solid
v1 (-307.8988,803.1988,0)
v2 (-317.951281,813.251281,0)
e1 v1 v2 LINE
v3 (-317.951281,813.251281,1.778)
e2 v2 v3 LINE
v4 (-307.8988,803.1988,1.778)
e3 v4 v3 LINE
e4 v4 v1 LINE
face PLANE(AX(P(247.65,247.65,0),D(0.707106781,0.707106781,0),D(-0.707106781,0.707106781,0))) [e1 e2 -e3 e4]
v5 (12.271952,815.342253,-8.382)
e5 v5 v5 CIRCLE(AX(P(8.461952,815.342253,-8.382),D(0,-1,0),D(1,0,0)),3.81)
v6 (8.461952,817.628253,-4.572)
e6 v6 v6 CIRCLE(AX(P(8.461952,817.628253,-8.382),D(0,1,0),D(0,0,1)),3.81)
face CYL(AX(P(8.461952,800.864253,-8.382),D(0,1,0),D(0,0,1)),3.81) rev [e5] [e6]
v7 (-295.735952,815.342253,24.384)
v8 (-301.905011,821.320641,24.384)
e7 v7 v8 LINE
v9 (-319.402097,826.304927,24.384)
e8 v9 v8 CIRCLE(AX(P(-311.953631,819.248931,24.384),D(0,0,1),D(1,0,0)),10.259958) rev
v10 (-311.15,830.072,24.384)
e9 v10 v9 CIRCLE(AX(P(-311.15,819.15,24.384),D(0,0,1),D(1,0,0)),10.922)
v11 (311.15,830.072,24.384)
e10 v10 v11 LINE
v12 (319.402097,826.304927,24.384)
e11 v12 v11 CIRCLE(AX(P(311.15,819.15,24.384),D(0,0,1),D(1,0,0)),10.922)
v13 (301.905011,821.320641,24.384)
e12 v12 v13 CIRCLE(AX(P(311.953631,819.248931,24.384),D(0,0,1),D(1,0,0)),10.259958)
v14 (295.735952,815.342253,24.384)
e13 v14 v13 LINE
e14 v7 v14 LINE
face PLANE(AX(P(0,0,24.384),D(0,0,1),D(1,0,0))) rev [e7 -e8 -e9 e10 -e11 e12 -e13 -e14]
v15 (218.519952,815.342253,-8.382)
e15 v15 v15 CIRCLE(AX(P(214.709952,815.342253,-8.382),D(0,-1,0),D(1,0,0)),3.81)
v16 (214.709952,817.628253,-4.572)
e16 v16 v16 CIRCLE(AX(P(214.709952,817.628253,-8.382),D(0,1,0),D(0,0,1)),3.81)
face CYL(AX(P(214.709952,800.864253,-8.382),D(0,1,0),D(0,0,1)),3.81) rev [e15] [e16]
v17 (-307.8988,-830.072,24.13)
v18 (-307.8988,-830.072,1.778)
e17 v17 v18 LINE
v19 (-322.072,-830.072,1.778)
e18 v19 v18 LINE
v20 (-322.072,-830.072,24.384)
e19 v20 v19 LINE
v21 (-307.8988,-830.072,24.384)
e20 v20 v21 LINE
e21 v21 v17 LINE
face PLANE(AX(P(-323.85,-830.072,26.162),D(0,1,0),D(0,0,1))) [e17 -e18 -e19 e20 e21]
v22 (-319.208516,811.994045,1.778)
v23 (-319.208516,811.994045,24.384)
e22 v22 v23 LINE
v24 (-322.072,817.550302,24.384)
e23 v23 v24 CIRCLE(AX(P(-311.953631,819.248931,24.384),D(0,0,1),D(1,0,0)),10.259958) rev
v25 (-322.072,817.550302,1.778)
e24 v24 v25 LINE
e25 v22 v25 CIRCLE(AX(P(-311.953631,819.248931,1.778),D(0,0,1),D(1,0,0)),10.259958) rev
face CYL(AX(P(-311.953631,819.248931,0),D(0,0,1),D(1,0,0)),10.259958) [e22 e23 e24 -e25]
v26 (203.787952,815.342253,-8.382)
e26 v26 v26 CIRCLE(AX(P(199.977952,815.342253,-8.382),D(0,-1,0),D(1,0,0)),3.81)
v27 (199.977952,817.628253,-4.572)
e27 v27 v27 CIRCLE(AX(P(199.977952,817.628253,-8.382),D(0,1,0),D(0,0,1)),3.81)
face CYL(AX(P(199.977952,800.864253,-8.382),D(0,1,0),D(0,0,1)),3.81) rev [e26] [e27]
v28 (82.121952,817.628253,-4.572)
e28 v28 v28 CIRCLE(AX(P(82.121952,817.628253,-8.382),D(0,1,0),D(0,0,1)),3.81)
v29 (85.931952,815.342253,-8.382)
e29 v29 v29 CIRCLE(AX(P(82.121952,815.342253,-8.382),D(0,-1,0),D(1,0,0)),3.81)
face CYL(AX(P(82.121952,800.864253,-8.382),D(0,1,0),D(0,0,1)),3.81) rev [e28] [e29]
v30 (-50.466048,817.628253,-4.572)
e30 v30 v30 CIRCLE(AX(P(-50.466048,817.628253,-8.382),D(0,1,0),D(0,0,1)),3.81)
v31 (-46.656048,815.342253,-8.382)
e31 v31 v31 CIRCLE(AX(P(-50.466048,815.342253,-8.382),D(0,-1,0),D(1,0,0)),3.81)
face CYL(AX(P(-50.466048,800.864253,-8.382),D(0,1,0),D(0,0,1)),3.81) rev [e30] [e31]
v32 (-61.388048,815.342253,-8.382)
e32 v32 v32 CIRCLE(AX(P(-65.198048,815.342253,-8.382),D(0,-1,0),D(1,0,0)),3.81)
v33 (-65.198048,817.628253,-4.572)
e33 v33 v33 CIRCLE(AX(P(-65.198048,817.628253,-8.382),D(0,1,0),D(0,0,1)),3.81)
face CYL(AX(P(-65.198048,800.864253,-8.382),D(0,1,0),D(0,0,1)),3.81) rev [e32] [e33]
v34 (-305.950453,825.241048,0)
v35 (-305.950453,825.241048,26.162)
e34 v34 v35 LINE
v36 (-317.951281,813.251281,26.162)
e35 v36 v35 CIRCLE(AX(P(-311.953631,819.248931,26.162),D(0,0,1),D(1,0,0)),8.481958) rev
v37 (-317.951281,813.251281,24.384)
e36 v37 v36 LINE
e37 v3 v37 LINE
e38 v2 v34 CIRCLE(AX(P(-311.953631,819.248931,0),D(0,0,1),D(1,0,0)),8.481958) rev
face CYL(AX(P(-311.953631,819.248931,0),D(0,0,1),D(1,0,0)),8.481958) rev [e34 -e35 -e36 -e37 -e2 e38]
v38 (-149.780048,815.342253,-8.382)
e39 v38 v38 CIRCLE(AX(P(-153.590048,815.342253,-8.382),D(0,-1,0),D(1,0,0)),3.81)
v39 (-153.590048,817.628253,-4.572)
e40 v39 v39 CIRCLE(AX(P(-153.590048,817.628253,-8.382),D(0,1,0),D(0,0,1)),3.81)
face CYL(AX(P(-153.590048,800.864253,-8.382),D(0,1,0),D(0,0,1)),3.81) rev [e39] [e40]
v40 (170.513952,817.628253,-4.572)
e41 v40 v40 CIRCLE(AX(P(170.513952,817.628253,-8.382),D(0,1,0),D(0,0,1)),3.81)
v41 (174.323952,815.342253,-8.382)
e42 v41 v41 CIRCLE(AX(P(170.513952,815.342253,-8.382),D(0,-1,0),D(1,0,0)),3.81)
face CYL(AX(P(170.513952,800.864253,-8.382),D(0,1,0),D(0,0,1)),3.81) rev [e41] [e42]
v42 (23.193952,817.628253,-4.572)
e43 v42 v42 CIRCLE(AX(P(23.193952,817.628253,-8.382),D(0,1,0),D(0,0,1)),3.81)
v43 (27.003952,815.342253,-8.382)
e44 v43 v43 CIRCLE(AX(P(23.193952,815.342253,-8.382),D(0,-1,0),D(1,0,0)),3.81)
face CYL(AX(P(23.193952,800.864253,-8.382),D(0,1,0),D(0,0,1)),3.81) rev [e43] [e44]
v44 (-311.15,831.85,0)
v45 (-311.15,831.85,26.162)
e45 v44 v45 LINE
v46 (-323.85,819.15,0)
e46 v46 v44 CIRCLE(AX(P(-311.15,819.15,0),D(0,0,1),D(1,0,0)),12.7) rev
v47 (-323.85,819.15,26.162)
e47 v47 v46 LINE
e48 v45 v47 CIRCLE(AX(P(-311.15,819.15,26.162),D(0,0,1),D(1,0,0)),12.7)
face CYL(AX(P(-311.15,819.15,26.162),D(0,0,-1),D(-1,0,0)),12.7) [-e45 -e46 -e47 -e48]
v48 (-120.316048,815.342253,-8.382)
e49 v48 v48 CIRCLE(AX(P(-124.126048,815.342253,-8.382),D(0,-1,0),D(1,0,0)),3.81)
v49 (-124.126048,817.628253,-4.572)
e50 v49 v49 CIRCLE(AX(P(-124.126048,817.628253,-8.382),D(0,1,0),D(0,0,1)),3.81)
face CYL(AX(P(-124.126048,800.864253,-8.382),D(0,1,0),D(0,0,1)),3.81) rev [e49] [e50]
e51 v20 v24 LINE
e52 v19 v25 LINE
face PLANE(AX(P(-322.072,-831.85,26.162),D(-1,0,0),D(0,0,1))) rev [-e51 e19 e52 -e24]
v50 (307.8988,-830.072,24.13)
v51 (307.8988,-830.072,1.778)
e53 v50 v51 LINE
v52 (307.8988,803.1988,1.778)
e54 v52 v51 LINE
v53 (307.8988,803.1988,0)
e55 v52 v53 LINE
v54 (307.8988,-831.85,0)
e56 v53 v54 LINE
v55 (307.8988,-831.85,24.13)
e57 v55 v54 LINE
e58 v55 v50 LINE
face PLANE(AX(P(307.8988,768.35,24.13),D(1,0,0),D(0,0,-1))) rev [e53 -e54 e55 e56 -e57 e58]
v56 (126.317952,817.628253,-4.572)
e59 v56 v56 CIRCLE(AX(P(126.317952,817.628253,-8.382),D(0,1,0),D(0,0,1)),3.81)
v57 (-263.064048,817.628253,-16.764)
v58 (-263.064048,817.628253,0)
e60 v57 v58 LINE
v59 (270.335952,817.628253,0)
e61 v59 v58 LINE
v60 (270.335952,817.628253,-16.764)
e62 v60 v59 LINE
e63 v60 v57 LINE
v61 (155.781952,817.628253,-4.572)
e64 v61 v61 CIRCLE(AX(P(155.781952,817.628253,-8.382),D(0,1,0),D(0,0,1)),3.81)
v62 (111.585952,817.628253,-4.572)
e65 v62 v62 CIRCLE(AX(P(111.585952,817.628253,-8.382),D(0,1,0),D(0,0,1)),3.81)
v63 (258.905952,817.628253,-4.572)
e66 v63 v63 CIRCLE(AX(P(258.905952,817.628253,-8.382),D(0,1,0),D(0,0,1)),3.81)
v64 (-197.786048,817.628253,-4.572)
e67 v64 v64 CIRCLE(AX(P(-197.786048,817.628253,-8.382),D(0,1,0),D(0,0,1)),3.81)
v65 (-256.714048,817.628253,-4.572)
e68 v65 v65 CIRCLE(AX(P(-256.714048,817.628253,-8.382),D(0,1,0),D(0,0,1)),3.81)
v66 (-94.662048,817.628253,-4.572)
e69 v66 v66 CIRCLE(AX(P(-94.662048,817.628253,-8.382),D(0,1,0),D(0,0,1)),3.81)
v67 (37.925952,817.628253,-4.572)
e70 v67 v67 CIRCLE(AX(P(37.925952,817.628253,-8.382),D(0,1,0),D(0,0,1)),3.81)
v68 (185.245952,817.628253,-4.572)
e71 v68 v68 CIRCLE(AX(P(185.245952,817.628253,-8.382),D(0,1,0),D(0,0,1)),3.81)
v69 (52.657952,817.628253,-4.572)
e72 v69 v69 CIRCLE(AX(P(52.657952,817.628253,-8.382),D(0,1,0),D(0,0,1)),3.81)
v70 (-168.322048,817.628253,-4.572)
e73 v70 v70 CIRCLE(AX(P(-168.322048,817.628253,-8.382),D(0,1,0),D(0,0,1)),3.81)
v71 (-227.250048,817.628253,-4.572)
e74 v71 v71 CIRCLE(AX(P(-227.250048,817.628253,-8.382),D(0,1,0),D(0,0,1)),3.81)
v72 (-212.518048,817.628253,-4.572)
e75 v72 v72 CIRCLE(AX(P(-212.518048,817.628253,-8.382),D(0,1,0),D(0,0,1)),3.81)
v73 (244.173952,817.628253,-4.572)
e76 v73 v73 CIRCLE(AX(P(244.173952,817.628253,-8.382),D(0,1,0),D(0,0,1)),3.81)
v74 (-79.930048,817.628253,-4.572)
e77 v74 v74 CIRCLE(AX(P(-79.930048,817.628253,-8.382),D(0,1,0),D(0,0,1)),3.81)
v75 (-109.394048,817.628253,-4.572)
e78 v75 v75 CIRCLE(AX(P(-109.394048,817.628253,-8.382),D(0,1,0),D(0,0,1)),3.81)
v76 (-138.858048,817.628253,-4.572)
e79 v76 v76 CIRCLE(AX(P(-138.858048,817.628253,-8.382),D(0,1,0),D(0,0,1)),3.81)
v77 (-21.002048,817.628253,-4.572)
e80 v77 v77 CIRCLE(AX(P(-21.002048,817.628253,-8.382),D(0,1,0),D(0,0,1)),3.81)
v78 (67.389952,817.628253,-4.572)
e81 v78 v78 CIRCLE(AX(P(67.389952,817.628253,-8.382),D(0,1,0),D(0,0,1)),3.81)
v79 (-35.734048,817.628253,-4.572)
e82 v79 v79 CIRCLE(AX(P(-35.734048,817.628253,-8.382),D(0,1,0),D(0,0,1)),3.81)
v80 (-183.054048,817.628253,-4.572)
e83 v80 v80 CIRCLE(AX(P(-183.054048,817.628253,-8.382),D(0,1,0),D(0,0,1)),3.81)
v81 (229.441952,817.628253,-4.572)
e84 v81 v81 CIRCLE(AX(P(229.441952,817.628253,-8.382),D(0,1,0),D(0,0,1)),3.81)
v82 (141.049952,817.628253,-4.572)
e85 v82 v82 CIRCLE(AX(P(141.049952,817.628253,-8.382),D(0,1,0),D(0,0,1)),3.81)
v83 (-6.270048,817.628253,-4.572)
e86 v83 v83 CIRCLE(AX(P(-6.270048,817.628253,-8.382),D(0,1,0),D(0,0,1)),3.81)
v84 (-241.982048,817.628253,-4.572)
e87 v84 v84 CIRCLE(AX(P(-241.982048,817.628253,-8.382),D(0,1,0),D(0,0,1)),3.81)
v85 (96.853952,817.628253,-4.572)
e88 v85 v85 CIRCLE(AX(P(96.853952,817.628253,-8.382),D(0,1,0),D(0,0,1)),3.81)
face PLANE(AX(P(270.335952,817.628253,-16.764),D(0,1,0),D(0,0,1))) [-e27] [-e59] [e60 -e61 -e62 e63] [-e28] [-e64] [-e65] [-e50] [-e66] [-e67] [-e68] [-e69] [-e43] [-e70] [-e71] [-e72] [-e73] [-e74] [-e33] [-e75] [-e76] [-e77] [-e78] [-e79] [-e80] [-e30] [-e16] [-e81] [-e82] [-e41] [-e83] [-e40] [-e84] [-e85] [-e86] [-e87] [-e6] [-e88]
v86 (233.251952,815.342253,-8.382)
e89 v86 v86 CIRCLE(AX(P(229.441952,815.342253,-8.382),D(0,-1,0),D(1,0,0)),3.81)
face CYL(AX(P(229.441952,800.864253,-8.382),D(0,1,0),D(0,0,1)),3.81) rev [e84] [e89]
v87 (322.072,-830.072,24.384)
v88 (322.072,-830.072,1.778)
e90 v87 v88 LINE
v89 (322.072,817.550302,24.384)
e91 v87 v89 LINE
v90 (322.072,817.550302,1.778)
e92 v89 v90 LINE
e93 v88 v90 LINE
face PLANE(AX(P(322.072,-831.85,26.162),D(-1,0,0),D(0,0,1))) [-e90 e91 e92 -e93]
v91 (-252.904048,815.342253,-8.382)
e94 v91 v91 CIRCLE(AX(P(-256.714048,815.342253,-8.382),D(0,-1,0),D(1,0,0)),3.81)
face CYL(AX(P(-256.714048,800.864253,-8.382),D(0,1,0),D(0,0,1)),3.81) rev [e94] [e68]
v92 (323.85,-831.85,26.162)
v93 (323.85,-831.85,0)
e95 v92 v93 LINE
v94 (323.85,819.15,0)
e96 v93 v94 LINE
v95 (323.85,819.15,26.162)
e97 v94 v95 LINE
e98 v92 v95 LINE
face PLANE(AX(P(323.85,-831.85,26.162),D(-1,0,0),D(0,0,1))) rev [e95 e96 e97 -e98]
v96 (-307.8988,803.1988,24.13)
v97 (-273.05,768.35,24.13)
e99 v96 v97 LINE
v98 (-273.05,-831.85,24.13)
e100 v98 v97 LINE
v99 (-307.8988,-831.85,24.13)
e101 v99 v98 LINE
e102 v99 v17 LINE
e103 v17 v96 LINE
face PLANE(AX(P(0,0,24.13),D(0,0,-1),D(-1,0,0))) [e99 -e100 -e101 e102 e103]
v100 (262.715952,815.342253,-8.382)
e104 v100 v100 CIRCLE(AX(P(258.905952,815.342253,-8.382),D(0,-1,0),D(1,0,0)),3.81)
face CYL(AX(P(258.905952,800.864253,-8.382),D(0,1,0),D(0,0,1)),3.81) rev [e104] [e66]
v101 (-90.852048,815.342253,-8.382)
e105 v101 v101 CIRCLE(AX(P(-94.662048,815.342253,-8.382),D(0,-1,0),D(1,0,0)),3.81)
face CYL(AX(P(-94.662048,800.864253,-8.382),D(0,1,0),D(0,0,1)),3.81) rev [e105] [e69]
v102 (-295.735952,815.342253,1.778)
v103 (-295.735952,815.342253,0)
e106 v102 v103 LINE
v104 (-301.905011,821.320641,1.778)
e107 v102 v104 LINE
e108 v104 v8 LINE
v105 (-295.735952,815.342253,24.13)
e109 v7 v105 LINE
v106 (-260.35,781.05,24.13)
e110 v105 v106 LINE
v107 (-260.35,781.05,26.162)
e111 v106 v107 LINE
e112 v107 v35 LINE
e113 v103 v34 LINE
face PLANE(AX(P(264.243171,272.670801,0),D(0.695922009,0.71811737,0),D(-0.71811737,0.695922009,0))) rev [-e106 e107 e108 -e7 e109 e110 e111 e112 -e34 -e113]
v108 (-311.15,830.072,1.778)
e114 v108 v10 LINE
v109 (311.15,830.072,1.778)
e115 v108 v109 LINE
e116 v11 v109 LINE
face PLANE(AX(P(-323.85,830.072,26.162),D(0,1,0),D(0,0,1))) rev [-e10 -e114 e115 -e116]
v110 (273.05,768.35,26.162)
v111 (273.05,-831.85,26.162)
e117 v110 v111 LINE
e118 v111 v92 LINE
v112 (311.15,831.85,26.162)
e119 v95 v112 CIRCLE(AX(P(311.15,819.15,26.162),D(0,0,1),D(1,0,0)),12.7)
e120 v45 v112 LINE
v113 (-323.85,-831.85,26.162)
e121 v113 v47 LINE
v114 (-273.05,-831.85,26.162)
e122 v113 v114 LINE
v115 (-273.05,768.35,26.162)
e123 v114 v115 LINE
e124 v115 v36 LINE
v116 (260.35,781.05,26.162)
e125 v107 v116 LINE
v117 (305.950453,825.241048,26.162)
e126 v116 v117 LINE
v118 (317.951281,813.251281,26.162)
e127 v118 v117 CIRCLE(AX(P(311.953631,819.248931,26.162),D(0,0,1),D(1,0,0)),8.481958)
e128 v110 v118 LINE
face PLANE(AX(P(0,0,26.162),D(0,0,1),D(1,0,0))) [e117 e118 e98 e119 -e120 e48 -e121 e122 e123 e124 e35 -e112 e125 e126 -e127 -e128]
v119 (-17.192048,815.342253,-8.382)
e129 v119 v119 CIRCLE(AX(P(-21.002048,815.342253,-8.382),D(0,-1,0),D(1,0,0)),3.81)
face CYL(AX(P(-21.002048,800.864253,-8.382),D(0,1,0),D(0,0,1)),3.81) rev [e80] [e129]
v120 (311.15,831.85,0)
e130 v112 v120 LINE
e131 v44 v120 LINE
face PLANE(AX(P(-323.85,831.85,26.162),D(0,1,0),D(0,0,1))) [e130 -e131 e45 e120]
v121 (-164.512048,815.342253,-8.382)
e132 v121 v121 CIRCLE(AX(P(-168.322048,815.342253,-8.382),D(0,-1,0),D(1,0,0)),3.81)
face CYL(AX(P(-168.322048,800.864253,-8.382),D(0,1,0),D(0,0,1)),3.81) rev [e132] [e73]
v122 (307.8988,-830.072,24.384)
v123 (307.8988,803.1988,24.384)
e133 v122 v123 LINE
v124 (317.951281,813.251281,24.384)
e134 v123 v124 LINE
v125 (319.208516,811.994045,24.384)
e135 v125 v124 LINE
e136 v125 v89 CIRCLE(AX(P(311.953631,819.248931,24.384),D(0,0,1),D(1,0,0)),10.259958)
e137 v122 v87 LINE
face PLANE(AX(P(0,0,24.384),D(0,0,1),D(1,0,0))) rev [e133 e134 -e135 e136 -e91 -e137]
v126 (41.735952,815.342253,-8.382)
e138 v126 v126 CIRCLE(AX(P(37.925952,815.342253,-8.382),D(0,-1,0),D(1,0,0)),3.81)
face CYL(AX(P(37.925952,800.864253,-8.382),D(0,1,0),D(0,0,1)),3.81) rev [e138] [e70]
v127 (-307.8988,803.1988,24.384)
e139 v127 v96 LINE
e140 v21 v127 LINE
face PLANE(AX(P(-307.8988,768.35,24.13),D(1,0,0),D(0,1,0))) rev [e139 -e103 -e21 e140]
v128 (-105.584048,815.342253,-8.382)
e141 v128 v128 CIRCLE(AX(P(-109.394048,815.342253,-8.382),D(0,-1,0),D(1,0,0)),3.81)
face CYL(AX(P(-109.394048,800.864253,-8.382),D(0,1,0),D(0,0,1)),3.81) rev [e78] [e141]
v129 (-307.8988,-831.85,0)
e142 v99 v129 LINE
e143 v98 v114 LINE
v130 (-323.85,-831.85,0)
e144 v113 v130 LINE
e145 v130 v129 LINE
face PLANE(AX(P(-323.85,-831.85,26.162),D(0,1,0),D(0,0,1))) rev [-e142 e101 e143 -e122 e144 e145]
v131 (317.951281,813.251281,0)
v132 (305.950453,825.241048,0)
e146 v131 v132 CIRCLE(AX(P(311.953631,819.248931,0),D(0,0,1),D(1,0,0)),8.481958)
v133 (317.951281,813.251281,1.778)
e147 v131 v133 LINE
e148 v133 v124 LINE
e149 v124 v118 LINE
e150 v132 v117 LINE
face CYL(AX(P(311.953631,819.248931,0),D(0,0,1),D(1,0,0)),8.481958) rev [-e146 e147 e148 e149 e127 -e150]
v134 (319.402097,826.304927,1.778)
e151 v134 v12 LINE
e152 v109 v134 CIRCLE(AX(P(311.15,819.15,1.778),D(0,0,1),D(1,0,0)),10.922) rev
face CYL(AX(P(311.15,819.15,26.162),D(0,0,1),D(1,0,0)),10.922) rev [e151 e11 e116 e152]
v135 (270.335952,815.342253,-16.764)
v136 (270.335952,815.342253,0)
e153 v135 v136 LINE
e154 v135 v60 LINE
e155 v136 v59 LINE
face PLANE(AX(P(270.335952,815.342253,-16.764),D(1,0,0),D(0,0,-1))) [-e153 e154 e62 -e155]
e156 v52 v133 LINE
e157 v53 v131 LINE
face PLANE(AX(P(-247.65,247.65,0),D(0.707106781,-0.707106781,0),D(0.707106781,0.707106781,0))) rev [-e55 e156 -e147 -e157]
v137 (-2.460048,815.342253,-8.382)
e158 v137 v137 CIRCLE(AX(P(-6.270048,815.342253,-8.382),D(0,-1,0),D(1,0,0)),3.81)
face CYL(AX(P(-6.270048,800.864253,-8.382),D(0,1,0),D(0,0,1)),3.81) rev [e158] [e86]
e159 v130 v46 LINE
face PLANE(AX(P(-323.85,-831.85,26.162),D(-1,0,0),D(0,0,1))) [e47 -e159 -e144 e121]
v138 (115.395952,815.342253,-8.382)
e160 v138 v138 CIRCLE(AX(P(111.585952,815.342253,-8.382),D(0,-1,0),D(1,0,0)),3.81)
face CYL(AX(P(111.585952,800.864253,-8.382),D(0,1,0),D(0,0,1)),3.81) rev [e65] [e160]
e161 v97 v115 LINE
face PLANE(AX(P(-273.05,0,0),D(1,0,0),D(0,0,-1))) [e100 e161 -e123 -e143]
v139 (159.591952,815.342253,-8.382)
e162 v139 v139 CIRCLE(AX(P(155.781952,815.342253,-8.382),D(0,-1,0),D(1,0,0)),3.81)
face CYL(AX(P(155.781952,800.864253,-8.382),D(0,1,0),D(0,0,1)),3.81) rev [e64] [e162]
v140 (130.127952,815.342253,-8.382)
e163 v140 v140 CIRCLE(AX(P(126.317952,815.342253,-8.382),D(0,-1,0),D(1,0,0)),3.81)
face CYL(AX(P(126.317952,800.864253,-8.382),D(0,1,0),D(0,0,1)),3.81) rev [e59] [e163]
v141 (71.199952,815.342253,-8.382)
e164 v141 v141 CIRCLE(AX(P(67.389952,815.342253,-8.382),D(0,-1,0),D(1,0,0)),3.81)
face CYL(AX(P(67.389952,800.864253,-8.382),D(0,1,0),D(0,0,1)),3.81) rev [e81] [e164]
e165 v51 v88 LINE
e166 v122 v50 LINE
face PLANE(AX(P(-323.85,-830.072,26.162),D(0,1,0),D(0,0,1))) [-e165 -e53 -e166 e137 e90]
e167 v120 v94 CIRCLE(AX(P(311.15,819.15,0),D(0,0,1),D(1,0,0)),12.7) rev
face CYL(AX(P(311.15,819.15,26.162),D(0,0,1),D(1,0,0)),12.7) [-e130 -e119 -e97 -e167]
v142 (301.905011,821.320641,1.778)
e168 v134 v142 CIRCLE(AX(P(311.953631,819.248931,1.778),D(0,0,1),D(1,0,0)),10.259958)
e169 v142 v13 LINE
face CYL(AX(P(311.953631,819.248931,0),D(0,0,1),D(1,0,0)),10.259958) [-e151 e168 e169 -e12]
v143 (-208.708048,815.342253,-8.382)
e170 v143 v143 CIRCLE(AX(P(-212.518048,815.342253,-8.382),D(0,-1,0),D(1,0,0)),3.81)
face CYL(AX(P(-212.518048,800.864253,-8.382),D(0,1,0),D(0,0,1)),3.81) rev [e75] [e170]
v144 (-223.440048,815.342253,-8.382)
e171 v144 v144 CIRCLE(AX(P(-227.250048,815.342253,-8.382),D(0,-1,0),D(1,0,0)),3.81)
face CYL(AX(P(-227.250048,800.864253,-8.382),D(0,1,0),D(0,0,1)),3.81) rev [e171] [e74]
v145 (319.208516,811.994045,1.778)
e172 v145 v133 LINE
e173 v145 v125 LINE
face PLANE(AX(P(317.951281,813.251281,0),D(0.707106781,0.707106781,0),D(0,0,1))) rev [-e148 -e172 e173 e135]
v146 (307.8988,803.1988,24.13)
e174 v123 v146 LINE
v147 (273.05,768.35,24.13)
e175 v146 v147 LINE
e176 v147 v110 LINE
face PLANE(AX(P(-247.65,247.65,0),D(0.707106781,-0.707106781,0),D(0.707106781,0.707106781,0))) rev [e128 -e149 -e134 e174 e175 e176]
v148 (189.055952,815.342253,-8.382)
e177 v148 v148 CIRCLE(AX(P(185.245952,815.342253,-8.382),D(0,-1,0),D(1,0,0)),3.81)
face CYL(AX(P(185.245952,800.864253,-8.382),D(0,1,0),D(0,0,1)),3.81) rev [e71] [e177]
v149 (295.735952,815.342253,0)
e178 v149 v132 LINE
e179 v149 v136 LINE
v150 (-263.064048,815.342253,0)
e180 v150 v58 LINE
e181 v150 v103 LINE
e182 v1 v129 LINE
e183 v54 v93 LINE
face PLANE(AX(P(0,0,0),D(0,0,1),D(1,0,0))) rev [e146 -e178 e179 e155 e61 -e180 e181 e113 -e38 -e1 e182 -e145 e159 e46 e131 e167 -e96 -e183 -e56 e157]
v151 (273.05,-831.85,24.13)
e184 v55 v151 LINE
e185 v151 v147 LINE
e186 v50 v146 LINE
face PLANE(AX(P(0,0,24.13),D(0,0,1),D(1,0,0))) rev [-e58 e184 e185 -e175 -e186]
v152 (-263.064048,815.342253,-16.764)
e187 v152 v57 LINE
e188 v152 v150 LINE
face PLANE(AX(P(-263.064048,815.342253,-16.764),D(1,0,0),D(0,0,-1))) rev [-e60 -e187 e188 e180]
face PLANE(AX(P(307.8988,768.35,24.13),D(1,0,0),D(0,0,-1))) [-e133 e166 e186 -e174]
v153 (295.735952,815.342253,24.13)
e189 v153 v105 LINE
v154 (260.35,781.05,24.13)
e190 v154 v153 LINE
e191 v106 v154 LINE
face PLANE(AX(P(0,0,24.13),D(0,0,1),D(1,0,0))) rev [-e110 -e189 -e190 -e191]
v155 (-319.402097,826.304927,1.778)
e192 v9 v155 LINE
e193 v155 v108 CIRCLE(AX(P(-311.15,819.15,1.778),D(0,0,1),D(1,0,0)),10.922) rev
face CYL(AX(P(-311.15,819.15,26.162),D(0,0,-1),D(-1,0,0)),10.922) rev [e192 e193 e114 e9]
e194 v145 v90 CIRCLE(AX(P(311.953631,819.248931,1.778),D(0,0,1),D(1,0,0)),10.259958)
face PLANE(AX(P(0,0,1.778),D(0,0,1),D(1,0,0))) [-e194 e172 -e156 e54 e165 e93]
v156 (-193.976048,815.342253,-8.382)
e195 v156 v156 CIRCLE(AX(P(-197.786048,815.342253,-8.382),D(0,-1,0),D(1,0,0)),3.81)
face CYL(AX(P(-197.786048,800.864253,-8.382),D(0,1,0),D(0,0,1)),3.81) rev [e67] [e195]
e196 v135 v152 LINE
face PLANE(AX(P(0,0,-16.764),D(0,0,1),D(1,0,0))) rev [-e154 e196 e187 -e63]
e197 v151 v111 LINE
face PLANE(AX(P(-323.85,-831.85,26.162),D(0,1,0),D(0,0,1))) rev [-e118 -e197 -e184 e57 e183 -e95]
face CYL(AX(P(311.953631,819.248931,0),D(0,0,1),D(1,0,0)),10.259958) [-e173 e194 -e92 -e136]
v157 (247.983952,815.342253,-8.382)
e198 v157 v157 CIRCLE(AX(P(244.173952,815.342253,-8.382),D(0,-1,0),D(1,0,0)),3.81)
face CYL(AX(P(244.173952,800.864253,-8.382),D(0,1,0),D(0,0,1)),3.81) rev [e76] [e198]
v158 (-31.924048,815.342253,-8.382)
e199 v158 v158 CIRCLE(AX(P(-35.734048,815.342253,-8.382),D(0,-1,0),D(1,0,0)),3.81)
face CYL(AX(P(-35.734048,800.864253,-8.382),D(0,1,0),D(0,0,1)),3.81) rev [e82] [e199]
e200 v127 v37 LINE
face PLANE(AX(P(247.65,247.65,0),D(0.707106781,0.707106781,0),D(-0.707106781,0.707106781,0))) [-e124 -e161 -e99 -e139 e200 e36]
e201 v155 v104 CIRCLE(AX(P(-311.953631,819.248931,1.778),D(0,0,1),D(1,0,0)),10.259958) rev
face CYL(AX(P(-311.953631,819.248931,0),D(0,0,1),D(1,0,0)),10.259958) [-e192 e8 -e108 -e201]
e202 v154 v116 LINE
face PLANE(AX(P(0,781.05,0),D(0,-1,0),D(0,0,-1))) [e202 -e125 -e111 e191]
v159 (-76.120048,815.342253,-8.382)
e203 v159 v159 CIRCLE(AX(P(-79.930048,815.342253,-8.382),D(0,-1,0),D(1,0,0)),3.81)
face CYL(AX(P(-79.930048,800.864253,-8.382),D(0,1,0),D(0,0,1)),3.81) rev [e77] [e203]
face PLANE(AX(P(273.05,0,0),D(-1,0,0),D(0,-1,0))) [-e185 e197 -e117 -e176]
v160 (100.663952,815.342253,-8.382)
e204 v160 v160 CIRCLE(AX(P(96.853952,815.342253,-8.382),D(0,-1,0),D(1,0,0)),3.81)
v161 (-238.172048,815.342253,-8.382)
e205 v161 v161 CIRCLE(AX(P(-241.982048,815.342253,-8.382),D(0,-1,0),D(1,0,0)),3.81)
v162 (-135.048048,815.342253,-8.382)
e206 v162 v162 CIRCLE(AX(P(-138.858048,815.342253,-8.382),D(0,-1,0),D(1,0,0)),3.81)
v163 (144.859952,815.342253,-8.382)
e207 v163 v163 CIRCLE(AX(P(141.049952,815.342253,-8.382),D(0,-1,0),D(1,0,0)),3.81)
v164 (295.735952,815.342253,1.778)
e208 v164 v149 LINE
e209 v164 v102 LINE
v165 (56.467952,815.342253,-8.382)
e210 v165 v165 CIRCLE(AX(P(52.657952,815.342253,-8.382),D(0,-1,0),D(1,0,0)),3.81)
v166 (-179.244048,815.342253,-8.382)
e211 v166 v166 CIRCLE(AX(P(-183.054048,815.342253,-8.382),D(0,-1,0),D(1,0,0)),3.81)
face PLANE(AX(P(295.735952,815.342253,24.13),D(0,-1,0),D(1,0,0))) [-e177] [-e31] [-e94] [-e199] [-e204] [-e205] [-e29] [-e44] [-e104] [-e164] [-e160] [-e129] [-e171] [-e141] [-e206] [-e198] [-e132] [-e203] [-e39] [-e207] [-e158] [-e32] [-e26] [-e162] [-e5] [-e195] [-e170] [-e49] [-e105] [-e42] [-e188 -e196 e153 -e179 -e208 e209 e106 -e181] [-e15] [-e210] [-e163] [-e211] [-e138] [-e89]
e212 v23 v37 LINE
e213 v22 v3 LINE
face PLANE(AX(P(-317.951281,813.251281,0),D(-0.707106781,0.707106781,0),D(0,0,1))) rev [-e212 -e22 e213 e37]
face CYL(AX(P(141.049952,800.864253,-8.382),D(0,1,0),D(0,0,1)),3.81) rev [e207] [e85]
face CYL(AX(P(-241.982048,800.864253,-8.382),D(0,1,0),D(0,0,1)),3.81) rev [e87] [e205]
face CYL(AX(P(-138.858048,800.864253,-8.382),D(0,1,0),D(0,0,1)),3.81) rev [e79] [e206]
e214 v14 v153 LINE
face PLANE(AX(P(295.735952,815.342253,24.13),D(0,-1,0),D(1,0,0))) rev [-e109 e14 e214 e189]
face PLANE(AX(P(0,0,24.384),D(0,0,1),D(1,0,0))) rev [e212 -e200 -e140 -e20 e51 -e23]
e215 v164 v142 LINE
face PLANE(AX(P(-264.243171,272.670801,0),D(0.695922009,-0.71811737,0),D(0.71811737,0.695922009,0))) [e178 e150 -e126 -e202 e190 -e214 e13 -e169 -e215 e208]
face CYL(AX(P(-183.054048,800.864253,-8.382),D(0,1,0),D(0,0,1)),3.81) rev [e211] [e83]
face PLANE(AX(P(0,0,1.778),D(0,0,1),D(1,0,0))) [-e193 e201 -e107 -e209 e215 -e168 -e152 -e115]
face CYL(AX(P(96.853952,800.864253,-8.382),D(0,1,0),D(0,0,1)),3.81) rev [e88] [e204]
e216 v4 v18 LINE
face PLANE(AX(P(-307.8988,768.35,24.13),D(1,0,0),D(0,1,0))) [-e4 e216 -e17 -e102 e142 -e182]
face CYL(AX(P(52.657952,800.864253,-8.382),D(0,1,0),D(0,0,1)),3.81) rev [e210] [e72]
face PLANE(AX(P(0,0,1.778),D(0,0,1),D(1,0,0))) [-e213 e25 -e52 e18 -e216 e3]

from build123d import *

# Parameters (mm, degrees)
SKETCH1_W           = 647.7
SKETCH1_H           = 1663.7
BOSS_EXTRUDE1_DEPTH = 26.162
SKETCH2_W           = 546.1
SKETCH2_H           = 1612.9
CUT_EXTRUDE1_DEPTH  = 26.162
CUT_EXTRUDE2_DEPTH  = 26.162
CUT_EXTRUDE3_DEPTH  = 24.13
FILLET1_R           = 12.7
SHELL4_START        = 1.778
SHELL4_DEPTH        = 22.606
SKETCH5_W           = 533.4
SKETCH5_H           = 2.286
BOSS_EXTRUDE3_DEPTH = 16.764
SKETCH7_R           = 3.81
CUT_EXTRUDE5_DEPTH  = 16.764


# Read off the part's stored shape, not the designer's step: Shell4
with BuildPart() as part:
    # Sketch1 → Boss-Extrude1 (new body)
    with BuildSketch(Plane.XY):
        Rectangle(SKETCH1_W, SKETCH1_H)
    extrude(amount=BOSS_EXTRUDE1_DEPTH)

    # Sketch2 → Cut-Extrude1 (cut)
    with BuildSketch(Plane.XY.offset(26.162)):
        with Locations((0, -25.4)):
            Rectangle(SKETCH2_W, SKETCH2_H)
    extrude(amount=-CUT_EXTRUDE1_DEPTH, mode=Mode.SUBTRACT)

    # Sketch3 → Cut-Extrude2 (cut)
    with BuildSketch(Plane.XY.offset(26.162)):
        with BuildLine():
            Line((-317.951280605, 813.251280605), (-273.05, 768.35))
            Line((-273.05, 768.35), (-273.05, 781.05))
            Line((-273.05, 781.05), (-260.35, 781.05))
            Line((-260.35, 781.05), (-305.950453026, 825.241047594))
            ThreePointArc((-305.950453026, 825.241047594), (-317.94851482, 825.249344949), (-317.951280605, 813.251280605))
        make_face()
        with BuildLine():
            Line((305.950453026, 825.241047594), (260.35, 781.05))
            Line((260.35, 781.05), (273.05, 781.05))
            Line((273.05, 781.05), (273.05, 768.35))
            Line((273.05, 768.35), (317.951280605, 813.251280605))
            ThreePointArc((317.951280605, 813.251280605), (317.94851482, 825.249344949), (305.950453026, 825.241047594))
        make_face()
    extrude(amount=-CUT_EXTRUDE2_DEPTH, mode=Mode.SUBTRACT)

    # Sketch4 → Cut-Extrude3 (cut)
    with BuildSketch(Plane(origin=(0, 0, 0), x_dir=(-1, 0, 0), z_dir=(0, 0, -1))):
        Polygon((-307.8988, 768.35), (-307.8988, 803.1988), (-273.05, 768.35), (-273.05, -831.85), (-307.8988, -831.85), align=None)
        Polygon((-260.35, 781.05), (-295.735951532, 815.342252918), (295.735951532, 815.342252918), (260.35, 781.05), align=None)
        Polygon((307.8988, 803.1988), (273.05, 768.35), (273.05, -831.85), (307.8988, -831.85), (307.8988, 768.35), align=None)
    extrude(amount=-CUT_EXTRUDE3_DEPTH, mode=Mode.SUBTRACT)

    # Fillet1
    fillet1_edges = [part.edges().sort_by_distance(p)[0] for p in [
        (-323.85, 831.85, 13.081),
        (323.85, 831.85, 13.081),
    ]]
    fillet(fillet1_edges, radius=FILLET1_R)

    # Shell4 outline → Shell4 (cut)
    with BuildSketch(Plane.XY.offset(SHELL4_START)):
        with BuildLine():
            Line((307.8988, 803.1988), (307.8988, -830.072))
            Line((307.8988, -830.072), (322.072, -830.072))
            Line((322.072, -830.072), (322.072, 817.550302353))
            ThreePointArc((322.072, 817.550302353), (321.07369087, 814.548798877), (319.208516462, 811.994044748))
            Line((319.208516462, 811.994044748), (317.951280605, 813.251280605))
            Line((317.951280605, 813.251280605), (307.8988, 803.1988))
        make_face()
        with BuildLine():
            Line((-322.072, -830.072), (-307.8988, -830.072))
            Line((-307.8988, -830.072), (-307.8988, 803.1988))
            Line((-307.8988, 803.1988), (-317.951280605, 813.251280605))
            Line((-317.951280605, 813.251280605), (-319.208516462, 811.994044748))
            ThreePointArc((-319.208516462, 811.994044748), (-321.07369087, 814.548798877), (-322.072, 817.550302353))
            Line((-322.072, 817.550302353), (-322.072, -830.072))
        make_face()
        with BuildLine():
            ThreePointArc((301.905011396, 821.320641288), (309.142763578, 829.116339567), (319.402097182, 826.304926702))
            ThreePointArc((319.402097182, 826.304926702), (315.685635268, 829.085698099), (311.15, 830.072))
            Line((311.15, 830.072), (-311.15, 830.072))
            ThreePointArc((-311.15, 830.072), (-315.685635267, 829.085698099), (-319.402097181, 826.304926702))
            ThreePointArc((-319.402097181, 826.304926702), (-309.142763577, 829.116339567), (-301.905011396, 821.320641288))
            Line((-301.905011396, 821.320641288), (-295.735951532, 815.342252918))
            Line((-295.735951532, 815.342252918), (295.735951532, 815.342252918))
            Line((295.735951532, 815.342252918), (301.905011396, 821.320641288))
        make_face()
    extrude(amount=SHELL4_DEPTH, mode=Mode.SUBTRACT)

    # Sketch5 → Boss-Extrude3 (add)
    with BuildSketch(Plane(origin=(0, 0, 0), x_dir=(-1, 0, 0), z_dir=(0, 0, -1))):
        with Locations((-3.635951532, 816.485252918)):
            Rectangle(SKETCH5_W, SKETCH5_H)
    extrude(amount=BOSS_EXTRUDE3_DEPTH)

    # Sketch7 → Cut-Extrude5 (cut)
    with BuildSketch(Plane(origin=(0, 817.628252918, 0), x_dir=(1, 0, 0), z_dir=(0, 1, 0))):
        with Locations(Location((-256.714048468, 8.382, 0), (0, 0, 270))):
            Circle(SKETCH7_R)
        with Locations(Location((-241.982048468, 8.382, 0), (0, 0, 270))):
            Circle(SKETCH7_R)
        with Locations(Location((-227.250048468, 8.382, 0), (0, 0, 270))):
            Circle(SKETCH7_R)
        with Locations(Location((-212.518048468, 8.382, 0), (0, 0, 270))):
            Circle(SKETCH7_R)
        with Locations(Location((-197.786048468, 8.382, 0), (0, 0, 270))):
            Circle(SKETCH7_R)
        with Locations(Location((-183.054048468, 8.382, 0), (0, 0, 270))):
            Circle(SKETCH7_R)
        with Locations(Location((-168.322048468, 8.382, 0), (0, 0, 270))):
            Circle(SKETCH7_R)
        with Locations(Location((-153.590048468, 8.382, 0), (0, 0, 270))):
            Circle(SKETCH7_R)
        with Locations(Location((-138.858048468, 8.382, 0), (0, 0, 270))):
            Circle(SKETCH7_R)
        with Locations(Location((-124.126048468, 8.382, 0), (0, 0, 270))):
            Circle(SKETCH7_R)
        with Locations(Location((-109.394048468, 8.382, 0), (0, 0, 270))):
            Circle(SKETCH7_R)
        with Locations(Location((-94.662048468, 8.382, 0), (0, 0, 270))):
            Circle(SKETCH7_R)
        with Locations(Location((-79.930048468, 8.382, 0), (0, 0, 270))):
            Circle(SKETCH7_R)
        with Locations(Location((-65.198048468, 8.382, 0), (0, 0, 270))):
            Circle(SKETCH7_R)
        with Locations(Location((-50.466048468, 8.382, 0), (0, 0, 270))):
            Circle(SKETCH7_R)
        with Locations(Location((-35.734048468, 8.382, 0), (0, 0, 270))):
            Circle(SKETCH7_R)
        with Locations(Location((-21.002048468, 8.382, 0), (0, 0, 270))):
            Circle(SKETCH7_R)
        with Locations(Location((-6.270048468, 8.382, 0), (0, 0, 270))):
            Circle(SKETCH7_R)
        with Locations(Location((8.461951532, 8.382, 0), (0, 0, 270))):
            Circle(SKETCH7_R)
        with Locations(Location((23.193951532, 8.382, 0), (0, 0, 270))):
            Circle(SKETCH7_R)
        with Locations(Location((37.925951532, 8.382, 0), (0, 0, 270))):
            Circle(SKETCH7_R)
        with Locations(Location((52.657951532, 8.382, 0), (0, 0, 270))):
            Circle(SKETCH7_R)
        with Locations(Location((67.389951532, 8.382, 0), (0, 0, 270))):
            Circle(SKETCH7_R)
        with Locations(Location((82.121951532, 8.382, 0), (0, 0, 270))):
            Circle(SKETCH7_R)
        with Locations(Location((96.853951532, 8.382, 0), (0, 0, 270))):
            Circle(SKETCH7_R)
        with Locations(Location((111.585951532, 8.382, 0), (0, 0, 270))):
            Circle(SKETCH7_R)
        with Locations(Location((126.317951532, 8.382, 0), (0, 0, 270))):
            Circle(SKETCH7_R)
        with Locations(Location((141.049951532, 8.382, 0), (0, 0, 270))):
            Circle(SKETCH7_R)
        with Locations(Location((155.781951532, 8.382, 0), (0, 0, 270))):
            Circle(SKETCH7_R)
        with Locations(Location((170.513951532, 8.382, 0), (0, 0, 270))):
            Circle(SKETCH7_R)
        with Locations(Location((185.245951532, 8.382, 0), (0, 0, 270))):
            Circle(SKETCH7_R)
        with Locations(Location((199.977951532, 8.382, 0), (0, 0, 270))):
            Circle(SKETCH7_R)
        with Locations(Location((214.709951532, 8.382, 0), (0, 0, 270))):
            Circle(SKETCH7_R)
        with Locations(Location((229.441951532, 8.382, 0), (0, 0, 270))):
            Circle(SKETCH7_R)
        with Locations(Location((244.173951532, 8.382, 0), (0, 0, 270))):
            Circle(SKETCH7_R)
        with Locations(Location((258.905951532, 8.382, 0), (0, 0, 270))):
            Circle(SKETCH7_R)
    extrude(amount=-CUT_EXTRUDE5_DEPTH, mode=Mode.SUBTRACT)


solid = part.part
